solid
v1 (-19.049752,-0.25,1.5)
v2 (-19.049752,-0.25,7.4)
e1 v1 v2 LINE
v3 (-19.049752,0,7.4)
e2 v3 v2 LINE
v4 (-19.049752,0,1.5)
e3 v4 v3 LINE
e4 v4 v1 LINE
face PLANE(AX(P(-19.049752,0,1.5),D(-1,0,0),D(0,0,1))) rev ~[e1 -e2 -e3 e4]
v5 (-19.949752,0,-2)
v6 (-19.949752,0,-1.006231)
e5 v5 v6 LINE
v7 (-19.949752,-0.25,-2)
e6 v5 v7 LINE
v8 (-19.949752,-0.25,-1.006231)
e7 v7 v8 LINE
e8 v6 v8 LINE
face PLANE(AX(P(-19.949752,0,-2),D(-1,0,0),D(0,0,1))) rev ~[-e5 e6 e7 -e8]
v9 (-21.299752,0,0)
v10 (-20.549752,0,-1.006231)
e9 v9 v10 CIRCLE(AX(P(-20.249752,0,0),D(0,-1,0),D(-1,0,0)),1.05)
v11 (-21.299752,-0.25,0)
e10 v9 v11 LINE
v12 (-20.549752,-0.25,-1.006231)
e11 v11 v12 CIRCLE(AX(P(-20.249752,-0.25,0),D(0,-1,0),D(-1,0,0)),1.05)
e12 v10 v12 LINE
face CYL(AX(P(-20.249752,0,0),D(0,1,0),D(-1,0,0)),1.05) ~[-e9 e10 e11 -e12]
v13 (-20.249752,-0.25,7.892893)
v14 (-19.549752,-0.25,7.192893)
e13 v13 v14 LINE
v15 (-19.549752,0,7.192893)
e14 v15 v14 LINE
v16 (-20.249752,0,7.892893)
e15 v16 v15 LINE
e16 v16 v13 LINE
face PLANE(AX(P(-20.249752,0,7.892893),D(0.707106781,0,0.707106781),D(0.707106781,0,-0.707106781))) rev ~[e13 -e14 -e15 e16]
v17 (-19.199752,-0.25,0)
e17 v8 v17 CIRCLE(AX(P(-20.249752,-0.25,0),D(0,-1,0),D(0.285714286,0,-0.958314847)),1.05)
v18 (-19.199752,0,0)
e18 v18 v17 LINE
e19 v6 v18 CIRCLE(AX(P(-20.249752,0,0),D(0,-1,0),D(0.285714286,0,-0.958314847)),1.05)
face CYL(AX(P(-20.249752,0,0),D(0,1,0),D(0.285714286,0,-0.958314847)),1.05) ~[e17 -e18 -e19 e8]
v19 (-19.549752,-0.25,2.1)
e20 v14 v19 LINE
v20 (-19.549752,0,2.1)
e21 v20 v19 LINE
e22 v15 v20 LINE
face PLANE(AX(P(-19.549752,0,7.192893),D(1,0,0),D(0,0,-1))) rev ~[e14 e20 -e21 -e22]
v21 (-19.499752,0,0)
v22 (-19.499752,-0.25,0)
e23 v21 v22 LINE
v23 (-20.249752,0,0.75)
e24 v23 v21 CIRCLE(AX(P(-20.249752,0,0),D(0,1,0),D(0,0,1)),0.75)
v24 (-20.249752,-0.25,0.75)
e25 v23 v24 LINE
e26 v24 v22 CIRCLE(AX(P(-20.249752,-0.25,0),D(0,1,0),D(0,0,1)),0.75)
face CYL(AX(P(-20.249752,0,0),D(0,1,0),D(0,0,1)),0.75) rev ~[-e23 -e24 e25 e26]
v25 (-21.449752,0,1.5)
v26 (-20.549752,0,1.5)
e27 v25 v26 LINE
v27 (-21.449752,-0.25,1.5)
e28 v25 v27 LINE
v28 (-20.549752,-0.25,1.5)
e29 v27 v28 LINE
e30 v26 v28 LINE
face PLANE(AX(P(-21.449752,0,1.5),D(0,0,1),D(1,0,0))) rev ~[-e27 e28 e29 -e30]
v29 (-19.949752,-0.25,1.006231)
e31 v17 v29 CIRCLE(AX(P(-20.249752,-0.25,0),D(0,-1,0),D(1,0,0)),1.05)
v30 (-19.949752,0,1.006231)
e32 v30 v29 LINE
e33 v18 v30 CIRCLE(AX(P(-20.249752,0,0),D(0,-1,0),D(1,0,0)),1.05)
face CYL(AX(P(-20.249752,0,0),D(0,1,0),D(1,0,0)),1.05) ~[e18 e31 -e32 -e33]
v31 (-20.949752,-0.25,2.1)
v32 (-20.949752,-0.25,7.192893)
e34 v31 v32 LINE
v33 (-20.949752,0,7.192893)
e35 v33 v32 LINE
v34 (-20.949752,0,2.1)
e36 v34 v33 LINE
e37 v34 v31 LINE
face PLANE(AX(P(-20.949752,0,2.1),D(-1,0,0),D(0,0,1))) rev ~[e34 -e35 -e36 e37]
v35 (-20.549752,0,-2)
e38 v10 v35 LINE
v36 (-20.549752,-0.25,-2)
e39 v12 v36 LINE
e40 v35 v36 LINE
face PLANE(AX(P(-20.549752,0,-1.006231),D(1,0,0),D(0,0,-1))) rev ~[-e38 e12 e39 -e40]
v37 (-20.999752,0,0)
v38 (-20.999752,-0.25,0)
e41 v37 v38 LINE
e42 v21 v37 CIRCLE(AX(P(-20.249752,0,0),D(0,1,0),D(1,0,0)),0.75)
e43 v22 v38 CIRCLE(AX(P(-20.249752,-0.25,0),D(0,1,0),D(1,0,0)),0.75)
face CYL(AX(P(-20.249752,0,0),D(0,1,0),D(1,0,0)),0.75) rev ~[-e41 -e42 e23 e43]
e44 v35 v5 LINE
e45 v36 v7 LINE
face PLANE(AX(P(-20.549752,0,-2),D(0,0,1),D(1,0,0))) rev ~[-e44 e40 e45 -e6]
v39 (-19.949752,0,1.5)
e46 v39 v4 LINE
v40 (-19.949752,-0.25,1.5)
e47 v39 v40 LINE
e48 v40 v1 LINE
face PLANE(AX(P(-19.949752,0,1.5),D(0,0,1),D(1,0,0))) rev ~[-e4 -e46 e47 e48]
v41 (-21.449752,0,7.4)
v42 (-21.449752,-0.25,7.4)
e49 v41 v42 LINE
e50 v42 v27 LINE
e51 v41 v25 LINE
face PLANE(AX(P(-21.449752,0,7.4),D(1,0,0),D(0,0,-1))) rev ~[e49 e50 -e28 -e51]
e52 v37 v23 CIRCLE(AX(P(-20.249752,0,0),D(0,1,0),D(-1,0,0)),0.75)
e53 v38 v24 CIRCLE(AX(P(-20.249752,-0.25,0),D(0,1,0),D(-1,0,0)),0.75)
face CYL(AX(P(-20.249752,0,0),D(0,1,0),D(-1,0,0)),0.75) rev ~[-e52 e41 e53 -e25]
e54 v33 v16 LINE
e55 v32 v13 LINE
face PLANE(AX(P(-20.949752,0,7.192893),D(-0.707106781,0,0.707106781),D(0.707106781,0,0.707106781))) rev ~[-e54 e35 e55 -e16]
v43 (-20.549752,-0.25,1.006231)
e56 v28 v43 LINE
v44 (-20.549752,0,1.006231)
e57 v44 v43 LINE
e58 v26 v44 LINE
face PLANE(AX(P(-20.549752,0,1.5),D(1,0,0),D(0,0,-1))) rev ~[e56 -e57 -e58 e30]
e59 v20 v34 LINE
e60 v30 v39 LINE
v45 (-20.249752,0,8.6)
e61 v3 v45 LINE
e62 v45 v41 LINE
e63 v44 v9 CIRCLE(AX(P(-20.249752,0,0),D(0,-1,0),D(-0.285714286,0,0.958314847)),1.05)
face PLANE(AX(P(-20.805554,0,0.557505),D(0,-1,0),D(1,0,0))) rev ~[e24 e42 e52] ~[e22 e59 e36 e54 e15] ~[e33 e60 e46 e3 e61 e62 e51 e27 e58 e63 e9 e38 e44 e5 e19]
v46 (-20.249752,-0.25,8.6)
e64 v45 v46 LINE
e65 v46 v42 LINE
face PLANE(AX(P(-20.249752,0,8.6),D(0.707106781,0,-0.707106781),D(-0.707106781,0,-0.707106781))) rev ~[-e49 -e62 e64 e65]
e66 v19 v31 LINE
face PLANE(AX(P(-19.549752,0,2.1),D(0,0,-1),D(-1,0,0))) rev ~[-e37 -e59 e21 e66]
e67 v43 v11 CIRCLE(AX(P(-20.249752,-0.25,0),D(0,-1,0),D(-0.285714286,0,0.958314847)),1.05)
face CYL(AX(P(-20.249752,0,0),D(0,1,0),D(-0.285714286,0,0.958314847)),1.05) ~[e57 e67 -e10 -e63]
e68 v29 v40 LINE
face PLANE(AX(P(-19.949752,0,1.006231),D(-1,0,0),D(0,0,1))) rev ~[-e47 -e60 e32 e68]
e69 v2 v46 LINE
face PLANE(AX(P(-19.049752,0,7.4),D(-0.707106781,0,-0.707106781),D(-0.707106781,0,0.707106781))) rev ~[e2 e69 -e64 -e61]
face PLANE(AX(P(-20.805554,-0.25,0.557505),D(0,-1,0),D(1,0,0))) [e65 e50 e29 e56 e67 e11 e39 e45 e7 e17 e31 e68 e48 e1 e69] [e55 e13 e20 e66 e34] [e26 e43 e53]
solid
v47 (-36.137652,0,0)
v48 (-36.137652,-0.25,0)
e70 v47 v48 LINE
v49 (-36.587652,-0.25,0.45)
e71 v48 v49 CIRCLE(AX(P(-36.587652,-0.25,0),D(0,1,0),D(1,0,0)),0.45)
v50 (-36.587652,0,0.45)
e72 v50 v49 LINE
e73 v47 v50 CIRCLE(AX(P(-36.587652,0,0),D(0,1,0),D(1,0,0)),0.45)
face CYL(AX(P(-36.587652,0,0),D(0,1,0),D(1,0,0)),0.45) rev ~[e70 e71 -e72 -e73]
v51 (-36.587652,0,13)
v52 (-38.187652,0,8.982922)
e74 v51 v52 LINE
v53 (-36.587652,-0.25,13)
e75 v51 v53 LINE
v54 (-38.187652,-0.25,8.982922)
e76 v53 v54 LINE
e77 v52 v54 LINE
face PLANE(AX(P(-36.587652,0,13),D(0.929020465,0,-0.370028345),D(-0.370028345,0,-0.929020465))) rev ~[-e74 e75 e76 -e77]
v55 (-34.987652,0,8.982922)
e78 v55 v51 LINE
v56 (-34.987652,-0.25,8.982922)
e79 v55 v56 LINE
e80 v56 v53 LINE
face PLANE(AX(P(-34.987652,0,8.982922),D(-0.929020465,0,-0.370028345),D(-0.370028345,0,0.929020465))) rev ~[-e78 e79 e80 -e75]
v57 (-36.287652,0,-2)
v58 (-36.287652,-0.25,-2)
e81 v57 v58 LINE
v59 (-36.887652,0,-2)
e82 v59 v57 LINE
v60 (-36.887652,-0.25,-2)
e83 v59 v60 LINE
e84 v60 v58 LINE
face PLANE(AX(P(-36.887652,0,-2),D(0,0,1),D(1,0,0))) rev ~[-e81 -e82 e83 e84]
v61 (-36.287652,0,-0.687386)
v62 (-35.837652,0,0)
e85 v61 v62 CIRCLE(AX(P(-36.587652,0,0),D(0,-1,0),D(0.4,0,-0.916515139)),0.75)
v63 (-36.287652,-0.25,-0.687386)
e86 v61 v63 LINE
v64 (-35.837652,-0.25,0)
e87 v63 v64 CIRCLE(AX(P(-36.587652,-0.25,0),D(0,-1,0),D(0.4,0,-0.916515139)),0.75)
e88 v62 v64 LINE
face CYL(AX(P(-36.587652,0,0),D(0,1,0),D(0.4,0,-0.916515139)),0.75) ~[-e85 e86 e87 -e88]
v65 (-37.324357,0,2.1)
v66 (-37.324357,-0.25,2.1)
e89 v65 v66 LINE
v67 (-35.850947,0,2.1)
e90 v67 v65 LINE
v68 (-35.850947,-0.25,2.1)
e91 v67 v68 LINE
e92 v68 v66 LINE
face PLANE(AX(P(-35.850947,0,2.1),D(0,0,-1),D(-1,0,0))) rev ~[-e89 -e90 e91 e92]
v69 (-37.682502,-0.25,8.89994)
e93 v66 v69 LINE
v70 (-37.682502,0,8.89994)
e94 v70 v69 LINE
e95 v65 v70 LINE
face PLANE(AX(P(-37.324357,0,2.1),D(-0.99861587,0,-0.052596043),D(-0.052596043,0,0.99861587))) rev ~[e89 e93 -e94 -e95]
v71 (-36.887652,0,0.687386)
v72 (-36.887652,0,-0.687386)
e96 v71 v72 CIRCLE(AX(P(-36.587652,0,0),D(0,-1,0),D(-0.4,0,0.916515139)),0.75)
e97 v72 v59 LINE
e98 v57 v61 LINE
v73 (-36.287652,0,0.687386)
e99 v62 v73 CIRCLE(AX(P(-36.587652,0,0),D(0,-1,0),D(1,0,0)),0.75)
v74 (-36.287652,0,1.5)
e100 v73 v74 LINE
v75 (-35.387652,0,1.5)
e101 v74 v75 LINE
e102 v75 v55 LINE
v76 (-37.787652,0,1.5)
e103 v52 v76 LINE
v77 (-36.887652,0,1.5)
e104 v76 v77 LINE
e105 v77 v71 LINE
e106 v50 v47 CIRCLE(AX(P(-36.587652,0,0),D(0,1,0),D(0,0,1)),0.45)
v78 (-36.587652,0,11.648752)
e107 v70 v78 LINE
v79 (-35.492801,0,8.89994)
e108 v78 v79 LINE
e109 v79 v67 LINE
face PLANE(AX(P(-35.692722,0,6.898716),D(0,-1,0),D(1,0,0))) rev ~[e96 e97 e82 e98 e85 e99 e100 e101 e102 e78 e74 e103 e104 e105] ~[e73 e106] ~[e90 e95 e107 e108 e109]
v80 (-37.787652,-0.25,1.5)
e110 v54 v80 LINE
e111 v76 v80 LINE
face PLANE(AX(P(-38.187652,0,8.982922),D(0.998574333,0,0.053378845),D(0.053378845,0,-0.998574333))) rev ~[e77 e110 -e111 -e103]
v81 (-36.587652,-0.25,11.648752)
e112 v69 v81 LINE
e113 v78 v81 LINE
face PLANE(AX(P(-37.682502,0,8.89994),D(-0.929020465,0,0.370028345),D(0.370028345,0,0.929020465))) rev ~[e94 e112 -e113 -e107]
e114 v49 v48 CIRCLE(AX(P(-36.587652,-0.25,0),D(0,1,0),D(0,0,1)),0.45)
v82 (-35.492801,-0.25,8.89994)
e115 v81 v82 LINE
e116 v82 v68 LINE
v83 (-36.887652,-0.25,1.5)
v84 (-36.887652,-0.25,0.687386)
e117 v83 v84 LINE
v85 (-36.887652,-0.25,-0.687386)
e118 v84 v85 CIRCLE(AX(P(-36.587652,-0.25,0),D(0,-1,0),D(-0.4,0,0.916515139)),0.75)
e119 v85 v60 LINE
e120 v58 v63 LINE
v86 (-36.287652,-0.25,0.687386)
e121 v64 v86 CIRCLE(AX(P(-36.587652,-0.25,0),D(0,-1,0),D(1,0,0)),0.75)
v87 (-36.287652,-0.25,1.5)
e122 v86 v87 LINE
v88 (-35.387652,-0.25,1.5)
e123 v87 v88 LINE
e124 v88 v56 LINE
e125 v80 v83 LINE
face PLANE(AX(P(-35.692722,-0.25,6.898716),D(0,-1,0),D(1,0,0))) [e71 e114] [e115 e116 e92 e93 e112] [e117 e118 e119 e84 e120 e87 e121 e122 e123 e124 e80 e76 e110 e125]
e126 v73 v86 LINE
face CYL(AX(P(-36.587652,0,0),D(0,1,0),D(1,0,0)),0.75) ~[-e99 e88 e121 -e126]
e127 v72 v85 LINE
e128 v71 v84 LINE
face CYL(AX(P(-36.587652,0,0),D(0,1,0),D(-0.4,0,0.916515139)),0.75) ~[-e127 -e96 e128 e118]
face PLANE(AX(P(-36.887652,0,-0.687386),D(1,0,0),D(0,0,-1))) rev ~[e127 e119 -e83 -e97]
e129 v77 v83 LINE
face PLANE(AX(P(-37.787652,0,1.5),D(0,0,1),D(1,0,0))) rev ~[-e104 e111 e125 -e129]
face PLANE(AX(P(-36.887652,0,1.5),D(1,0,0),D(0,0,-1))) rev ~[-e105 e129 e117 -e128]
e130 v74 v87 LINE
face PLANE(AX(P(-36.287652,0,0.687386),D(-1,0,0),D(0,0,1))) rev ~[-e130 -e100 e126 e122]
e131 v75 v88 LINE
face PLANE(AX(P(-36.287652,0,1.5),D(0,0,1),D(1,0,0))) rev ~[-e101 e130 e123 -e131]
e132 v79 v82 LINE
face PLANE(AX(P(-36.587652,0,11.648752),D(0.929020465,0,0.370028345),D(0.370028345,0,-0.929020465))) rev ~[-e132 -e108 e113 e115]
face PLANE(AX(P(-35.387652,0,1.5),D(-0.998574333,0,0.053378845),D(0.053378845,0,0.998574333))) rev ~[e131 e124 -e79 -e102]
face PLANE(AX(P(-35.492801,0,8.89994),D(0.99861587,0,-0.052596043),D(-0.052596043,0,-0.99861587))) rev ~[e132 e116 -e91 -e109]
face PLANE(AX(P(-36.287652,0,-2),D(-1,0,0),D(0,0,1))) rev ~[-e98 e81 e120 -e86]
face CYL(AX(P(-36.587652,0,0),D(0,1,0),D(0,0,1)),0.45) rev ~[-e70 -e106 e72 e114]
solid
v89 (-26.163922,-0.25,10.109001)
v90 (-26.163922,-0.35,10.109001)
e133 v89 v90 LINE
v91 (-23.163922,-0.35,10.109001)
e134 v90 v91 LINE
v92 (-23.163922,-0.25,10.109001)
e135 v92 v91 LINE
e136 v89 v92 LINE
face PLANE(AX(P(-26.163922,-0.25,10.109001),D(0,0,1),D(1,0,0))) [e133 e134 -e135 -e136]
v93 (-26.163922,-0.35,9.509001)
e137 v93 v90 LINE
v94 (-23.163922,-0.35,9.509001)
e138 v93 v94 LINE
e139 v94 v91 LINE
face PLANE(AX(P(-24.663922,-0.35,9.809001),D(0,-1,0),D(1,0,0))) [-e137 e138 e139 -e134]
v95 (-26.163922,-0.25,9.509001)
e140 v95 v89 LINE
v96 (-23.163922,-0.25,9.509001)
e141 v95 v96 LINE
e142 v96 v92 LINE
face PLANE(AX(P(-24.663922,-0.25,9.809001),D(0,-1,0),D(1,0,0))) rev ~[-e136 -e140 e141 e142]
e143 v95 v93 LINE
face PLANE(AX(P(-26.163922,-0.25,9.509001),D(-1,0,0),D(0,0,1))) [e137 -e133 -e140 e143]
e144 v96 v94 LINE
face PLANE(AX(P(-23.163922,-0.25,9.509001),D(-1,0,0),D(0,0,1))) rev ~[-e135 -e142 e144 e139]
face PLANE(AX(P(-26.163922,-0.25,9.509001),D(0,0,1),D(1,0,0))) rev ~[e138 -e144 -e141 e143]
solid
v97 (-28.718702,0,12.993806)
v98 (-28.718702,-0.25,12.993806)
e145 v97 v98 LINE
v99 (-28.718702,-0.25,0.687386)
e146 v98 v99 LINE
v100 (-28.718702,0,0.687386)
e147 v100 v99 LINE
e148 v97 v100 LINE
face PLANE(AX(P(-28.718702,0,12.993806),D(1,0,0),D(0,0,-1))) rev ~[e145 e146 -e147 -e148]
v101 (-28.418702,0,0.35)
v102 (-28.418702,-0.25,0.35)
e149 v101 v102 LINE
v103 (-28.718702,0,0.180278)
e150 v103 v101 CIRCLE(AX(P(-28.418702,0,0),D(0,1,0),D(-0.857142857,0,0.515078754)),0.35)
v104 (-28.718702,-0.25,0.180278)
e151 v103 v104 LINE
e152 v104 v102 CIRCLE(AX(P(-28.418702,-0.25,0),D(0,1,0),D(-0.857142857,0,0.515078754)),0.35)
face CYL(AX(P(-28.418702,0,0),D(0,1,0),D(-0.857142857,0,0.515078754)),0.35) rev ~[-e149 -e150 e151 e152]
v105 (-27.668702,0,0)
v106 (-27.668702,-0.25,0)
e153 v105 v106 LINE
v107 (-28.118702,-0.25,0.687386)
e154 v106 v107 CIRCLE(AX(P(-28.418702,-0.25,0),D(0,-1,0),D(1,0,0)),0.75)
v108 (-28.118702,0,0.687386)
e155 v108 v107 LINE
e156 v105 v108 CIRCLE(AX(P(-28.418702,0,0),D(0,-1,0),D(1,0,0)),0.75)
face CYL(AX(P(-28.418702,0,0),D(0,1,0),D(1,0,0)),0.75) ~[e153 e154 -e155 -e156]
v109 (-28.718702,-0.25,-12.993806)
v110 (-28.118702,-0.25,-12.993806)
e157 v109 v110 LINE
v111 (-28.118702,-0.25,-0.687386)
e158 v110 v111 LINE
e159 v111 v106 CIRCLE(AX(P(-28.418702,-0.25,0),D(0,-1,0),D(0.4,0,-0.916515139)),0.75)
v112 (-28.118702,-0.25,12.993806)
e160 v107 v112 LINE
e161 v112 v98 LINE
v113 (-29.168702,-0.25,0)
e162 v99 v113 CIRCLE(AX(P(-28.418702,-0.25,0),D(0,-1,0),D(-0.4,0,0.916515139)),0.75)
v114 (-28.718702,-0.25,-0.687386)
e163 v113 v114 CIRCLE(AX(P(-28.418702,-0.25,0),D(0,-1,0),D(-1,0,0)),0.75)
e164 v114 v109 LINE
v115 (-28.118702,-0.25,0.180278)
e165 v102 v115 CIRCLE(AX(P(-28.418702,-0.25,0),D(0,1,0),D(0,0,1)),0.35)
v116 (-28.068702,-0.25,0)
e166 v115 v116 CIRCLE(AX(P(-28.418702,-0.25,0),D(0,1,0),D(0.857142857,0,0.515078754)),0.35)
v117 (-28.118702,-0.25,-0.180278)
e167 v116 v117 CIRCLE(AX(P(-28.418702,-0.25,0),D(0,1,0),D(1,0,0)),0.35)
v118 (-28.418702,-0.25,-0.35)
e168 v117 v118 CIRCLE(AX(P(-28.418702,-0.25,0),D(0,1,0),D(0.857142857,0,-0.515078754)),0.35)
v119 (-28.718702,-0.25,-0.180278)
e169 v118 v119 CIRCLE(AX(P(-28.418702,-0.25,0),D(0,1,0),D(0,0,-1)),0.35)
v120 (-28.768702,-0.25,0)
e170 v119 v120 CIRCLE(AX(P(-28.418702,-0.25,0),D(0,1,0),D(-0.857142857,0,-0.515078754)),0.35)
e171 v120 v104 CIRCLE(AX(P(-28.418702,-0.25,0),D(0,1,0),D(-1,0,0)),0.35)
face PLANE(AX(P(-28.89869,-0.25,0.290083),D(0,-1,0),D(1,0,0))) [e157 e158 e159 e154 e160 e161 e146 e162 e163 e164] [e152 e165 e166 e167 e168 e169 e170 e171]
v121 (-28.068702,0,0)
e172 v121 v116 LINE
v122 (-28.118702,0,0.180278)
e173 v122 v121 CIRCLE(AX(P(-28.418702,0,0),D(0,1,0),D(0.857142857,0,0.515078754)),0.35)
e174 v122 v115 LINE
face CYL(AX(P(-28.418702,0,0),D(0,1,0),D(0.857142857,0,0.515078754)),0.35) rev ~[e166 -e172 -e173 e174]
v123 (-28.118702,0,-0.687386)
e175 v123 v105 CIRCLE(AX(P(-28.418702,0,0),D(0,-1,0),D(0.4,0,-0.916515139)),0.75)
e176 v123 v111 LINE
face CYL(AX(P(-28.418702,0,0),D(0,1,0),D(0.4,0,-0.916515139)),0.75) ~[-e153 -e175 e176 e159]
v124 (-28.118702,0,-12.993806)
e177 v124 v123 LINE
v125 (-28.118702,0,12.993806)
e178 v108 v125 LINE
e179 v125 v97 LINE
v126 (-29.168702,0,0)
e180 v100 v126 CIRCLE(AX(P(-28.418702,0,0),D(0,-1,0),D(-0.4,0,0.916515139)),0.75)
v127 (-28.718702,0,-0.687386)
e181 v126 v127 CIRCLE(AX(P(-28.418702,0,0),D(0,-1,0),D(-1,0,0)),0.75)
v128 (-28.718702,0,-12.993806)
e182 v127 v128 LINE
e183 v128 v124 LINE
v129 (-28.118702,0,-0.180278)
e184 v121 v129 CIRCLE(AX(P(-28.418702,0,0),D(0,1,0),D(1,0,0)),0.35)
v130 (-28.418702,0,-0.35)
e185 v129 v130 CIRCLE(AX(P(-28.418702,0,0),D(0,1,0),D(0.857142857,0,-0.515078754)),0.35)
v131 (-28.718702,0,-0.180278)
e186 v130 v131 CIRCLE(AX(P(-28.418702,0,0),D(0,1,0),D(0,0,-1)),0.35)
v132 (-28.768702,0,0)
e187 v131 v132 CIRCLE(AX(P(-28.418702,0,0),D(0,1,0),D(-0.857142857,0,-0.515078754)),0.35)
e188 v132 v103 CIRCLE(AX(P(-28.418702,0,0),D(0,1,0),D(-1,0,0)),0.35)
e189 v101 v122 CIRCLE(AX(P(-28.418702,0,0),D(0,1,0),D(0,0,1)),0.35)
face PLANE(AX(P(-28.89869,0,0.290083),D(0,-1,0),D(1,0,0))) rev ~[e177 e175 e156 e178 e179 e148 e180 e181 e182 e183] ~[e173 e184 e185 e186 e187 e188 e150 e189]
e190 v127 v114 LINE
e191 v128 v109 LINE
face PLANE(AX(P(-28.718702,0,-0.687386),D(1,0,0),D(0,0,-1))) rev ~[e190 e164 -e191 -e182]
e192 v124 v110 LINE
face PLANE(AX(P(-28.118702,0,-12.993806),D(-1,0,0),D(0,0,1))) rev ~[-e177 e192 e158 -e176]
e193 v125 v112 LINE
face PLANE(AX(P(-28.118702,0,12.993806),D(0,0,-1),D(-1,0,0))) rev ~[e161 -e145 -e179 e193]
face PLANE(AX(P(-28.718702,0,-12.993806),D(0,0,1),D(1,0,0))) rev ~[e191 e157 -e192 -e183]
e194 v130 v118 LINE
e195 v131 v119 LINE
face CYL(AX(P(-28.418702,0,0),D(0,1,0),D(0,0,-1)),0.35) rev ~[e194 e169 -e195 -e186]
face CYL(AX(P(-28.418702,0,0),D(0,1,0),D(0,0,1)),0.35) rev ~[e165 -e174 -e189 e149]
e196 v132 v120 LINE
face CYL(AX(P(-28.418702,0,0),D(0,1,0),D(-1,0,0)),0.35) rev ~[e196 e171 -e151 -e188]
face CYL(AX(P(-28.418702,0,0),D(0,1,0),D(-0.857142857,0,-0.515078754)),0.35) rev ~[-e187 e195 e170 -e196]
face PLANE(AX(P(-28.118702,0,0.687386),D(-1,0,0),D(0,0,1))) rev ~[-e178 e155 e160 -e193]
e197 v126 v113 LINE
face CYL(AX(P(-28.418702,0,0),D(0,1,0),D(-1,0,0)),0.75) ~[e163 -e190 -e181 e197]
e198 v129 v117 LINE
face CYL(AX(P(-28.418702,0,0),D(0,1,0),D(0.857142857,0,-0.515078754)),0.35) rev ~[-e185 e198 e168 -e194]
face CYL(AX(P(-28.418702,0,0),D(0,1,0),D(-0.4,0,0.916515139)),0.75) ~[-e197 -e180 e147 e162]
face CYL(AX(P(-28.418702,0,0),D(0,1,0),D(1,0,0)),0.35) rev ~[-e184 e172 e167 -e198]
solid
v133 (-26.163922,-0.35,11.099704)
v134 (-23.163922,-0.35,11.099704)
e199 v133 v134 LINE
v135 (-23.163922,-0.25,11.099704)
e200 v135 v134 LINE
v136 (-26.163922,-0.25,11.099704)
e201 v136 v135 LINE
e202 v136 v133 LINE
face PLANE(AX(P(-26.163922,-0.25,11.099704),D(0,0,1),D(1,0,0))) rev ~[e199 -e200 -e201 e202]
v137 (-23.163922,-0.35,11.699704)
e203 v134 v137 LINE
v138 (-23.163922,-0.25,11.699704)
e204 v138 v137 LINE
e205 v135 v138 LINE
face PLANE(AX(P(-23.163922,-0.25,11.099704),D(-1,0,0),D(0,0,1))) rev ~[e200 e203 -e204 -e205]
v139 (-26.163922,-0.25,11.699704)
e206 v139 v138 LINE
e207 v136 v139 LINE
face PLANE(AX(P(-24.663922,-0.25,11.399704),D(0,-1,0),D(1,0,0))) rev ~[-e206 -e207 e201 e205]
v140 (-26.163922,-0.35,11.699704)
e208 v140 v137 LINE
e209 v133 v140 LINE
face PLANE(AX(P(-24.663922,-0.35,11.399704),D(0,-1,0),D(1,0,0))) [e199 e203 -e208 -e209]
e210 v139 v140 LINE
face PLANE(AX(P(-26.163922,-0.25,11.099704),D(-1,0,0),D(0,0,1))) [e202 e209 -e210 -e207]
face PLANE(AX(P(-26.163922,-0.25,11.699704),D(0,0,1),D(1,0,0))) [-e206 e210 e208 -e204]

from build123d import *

# Parameters (mm, degrees)
F0_W     = 0.5
F0_H     = 0.6
F1_DEPTH = 0.25
F0_W_2   = 3
F2_DEPTH = 0.1


# Not quite as in the source:
# - a feature names something its author has since deleted; it is built from what else it names


with BuildPart() as f1:
    # F0 (on Front) → F1 (new body)
    with BuildSketch(Plane.XZ):
        with BuildLine():
            ThreePointArc((-20.5497518182, 1.0062305899), (-21.0916247302, 0.6274950199), (-21.2997518182, 0))
            Line((-21.2997518182, 0), (-20.9997518182, 0))
            ThreePointArc((-20.9997518182, 0), (-20.7800819041, 0.5303300859), (-20.2497518182, 0.75))
            Line((-20.2497518182, 0.75), (-20.2497518182, 1.05))
            ThreePointArc((-20.2497518182, 1.05), (-20.4013398794, 1.0390000287), (-20.5497518182, 1.0062305899))
        make_face()
        with BuildLine():
            Line((-20.9997518182, 0), (-21.2997518182, 0))
            ThreePointArc((-21.2997518182, 0), (-21.0916247302, -0.6274950199), (-20.5497518182, -1.0062305899))
            ThreePointArc((-20.5497518182, -1.0062305899), (-20.2497518182, -1.05), (-19.9497518182, -1.0062305899))
            ThreePointArc((-19.9497518182, -1.0062305899), (-19.4078789062, -0.6274950199), (-19.1997518182, 0))
            ThreePointArc((-19.1997518182, 0), (-19.4078789062, 0.6274950199), (-19.9497518182, 1.0062305899))
            ThreePointArc((-19.9497518182, 1.0062305899), (-20.0981637569, 1.0390000287), (-20.2497518182, 1.05))
            Line((-20.2497518182, 1.05), (-20.2497518182, 0.75))
            ThreePointArc((-20.2497518182, 0.75), (-19.7194217323, 0.5303300859), (-19.4997518182, 0))
            ThreePointArc((-19.4997518182, 0), (-20.2497518182, -0.75), (-20.9997518182, 0))
        make_face()
        with BuildLine():
            Line((-20.5497518182, 1.5), (-20.5497518182, 1.0062305899))
            ThreePointArc((-20.5497518182, 1.0062305899), (-20.4013398794, 1.0390000287), (-20.2497518182, 1.05))
            Line((-20.2497518182, 1.05), (-20.2497518182, 1.5))
            Line((-20.2497518182, 1.5), (-20.5497518182, 1.5))
        make_face()
        with BuildLine():
            ThreePointArc((-19.9497518182, -1.0062305899), (-20.2497518182, -1.05), (-20.5497518182, -1.0062305899))
            Line((-20.5497518182, -1.0062305899), (-20.5497518182, -2))
            Line((-20.5497518182, -2), (-19.9497518182, -2))
            Line((-19.9497518182, -2), (-19.9497518182, -1.0062305899))
        make_face()
        with BuildLine():
            Line((-20.2497518182, 1.5), (-20.2497518182, 1.05))
            ThreePointArc((-20.2497518182, 1.05), (-20.0981637569, 1.0390000287), (-19.9497518182, 1.0062305899))
            Line((-19.9497518182, 1.0062305899), (-19.9497518182, 1.5))
            Line((-19.9497518182, 1.5), (-20.2497518182, 1.5))
        make_face()
        Polygon((-20.9497518182, 1.5), (-20.5497518182, 1.5), (-20.2497518182, 1.5), (-20.2497518182, 2.1), (-20.9497518182, 2.1), align=None)
        Polygon((-20.2497518182, 2.1), (-20.2497518182, 1.5), (-19.9497518182, 1.5), (-19.5497518182, 1.5), (-19.5497518182, 2.1), align=None)
        with Locations((-21.1997518182, 1.8)):
            Rectangle(F0_W, F0_H)
        Polygon((-21.4497518182, 2.1), (-20.9497518182, 2.1), (-20.9497518182, 7.1928932188), (-20.2497518182, 7.8928932188), (-20.2497518182, 8.6), (-21.4497518182, 7.4), align=None)
        with Locations((-19.2997518182, 1.8)):
            Rectangle(F0_W, F0_H)
        Polygon((-20.2497518182, 8.6), (-20.2497518182, 7.8928932188), (-19.5497518182, 7.1928932188), (-19.5497518182, 2.1), (-19.0497518182, 2.1), (-19.0497518182, 7.4), align=None)
    extrude(amount=F1_DEPTH)


with BuildPart() as f1b:
    # F0 (on Front) → F1, piece 2 (new body)
    with BuildSketch(Plane.XZ):
        with BuildLine():
            ThreePointArc((-28.7187018186, 0.6873863542), (-29.0461968385, 0.4107919181), (-29.1687018186, 0))
            Line((-29.1687018186, 0), (-28.7687018186, 0))
            ThreePointArc((-28.7687018186, 0), (-28.7559702577, 0.0935414347), (-28.7187018186, 0.1802775638))
            Line((-28.7187018186, 0.1802775638), (-28.7187018186, 0.6873863542))
        make_face()
        with BuildLine():
            Line((-28.7687018186, 0), (-29.1687018186, 0))
            ThreePointArc((-29.1687018186, 0), (-29.0461968385, -0.4107919181), (-28.7187018186, -0.6873863542))
            Line((-28.7187018186, -0.6873863542), (-28.7187018186, -0.1802775638))
            ThreePointArc((-28.7187018186, -0.1802775638), (-28.7559702577, -0.0935414347), (-28.7687018186, 0))
        make_face()
        with BuildLine():
            Line((-28.7187018186, 12.9938064694), (-28.7187018186, 0.6873863542))
            ThreePointArc((-28.7187018186, 0.6873863542), (-28.5719340514, 0.7341797347), (-28.4187018186, 0.75))
            Line((-28.4187018186, 0.75), (-28.4187018186, 12.9938064694))
            Line((-28.4187018186, 12.9938064694), (-28.7187018186, 12.9938064694))
        make_face()
        with BuildLine():
            ThreePointArc((-28.4187018186, 0.75), (-28.5719340514, 0.7341797347), (-28.7187018186, 0.6873863542))
            Line((-28.7187018186, 0.6873863542), (-28.7187018186, 0.1802775638))
            ThreePointArc((-28.7187018186, 0.1802775638), (-28.5910428362, 0.3046285831), (-28.4187018186, 0.35))
            Line((-28.4187018186, 0.35), (-28.4187018186, 0.75))
        make_face()
        with BuildLine():
            Line((-28.7187018186, -0.1802775638), (-28.7187018186, -0.6873863542))
            ThreePointArc((-28.7187018186, -0.6873863542), (-28.5719340514, -0.7341797347), (-28.4187018186, -0.75))
            Line((-28.4187018186, -0.75), (-28.4187018186, -0.35))
            ThreePointArc((-28.4187018186, -0.35), (-28.5910428362, -0.3046285831), (-28.7187018186, -0.1802775638))
        make_face()
        with BuildLine():
            ThreePointArc((-28.4187018186, -0.75), (-28.5719340514, -0.7341797347), (-28.7187018186, -0.6873863542))
            Line((-28.7187018186, -0.6873863542), (-28.7187018186, -12.9938064694))
            Line((-28.7187018186, -12.9938064694), (-28.4187018186, -12.9938064694))
            Line((-28.4187018186, -12.9938064694), (-28.4187018186, -0.75))
        make_face()
        with BuildLine():
            Line((-28.4187018186, 12.9938064694), (-28.4187018186, 0.75))
            ThreePointArc((-28.4187018186, 0.75), (-28.2654695858, 0.7341797347), (-28.1187018186, 0.6873863542))
            Line((-28.1187018186, 0.6873863542), (-28.1187018186, 12.9938064694))
            Line((-28.1187018186, 12.9938064694), (-28.4187018186, 12.9938064694))
        make_face()
        with BuildLine():
            ThreePointArc((-28.1187018186, 0.6873863542), (-28.2654695858, 0.7341797347), (-28.4187018186, 0.75))
            Line((-28.4187018186, 0.75), (-28.4187018186, 0.35))
            ThreePointArc((-28.4187018186, 0.35), (-28.246360801, 0.3046285831), (-28.1187018186, 0.1802775638))
            Line((-28.1187018186, 0.1802775638), (-28.1187018186, 0.6873863542))
        make_face()
        with BuildLine():
            Line((-28.4187018186, -0.35), (-28.4187018186, -0.75))
            ThreePointArc((-28.4187018186, -0.75), (-28.2654695858, -0.7341797347), (-28.1187018186, -0.6873863542))
            Line((-28.1187018186, -0.6873863542), (-28.1187018186, -0.1802775638))
            ThreePointArc((-28.1187018186, -0.1802775638), (-28.246360801, -0.3046285831), (-28.4187018186, -0.35))
        make_face()
        with BuildLine():
            ThreePointArc((-28.1187018186, -0.6873863542), (-28.2654695858, -0.7341797347), (-28.4187018186, -0.75))
            Line((-28.4187018186, -0.75), (-28.4187018186, -12.9938064694))
            Line((-28.4187018186, -12.9938064694), (-28.1187018186, -12.9938064694))
            Line((-28.1187018186, -12.9938064694), (-28.1187018186, -0.6873863542))
        make_face()
        with BuildLine():
            ThreePointArc((-27.6687018186, 0), (-27.7912067987, 0.4107919181), (-28.1187018186, 0.6873863542))
            Line((-28.1187018186, 0.6873863542), (-28.1187018186, 0.1802775638))
            ThreePointArc((-28.1187018186, 0.1802775638), (-28.0814333795, 0.0935414347), (-28.0687018186, 0))
            Line((-28.0687018186, 0), (-27.6687018186, 0))
        make_face()
        with BuildLine():
            Line((-28.1187018186, -0.1802775638), (-28.1187018186, -0.6873863542))
            ThreePointArc((-28.1187018186, -0.6873863542), (-27.7912067987, -0.4107919181), (-27.6687018186, 0))
            Line((-27.6687018186, 0), (-28.0687018186, 0))
            ThreePointArc((-28.0687018186, 0), (-28.0814333795, -0.0935414347), (-28.1187018186, -0.1802775638))
        make_face()
    extrude(amount=F1_DEPTH)


with BuildPart() as f1c:
    # F0 (on Front) → F1, piece 3 (new body)
    with BuildSketch(Plane.XZ):
        Polygon((-34.987651819, 8.9829219505), (-36.587651819, 13), (-36.587651819, 11.6487521661), (-35.4928014695, 8.8999400996), (-35.850947132, 2.1), (-36.587651819, 2.1), (-36.587651819, 1.5), (-36.287651819, 1.5), (-35.387651819, 1.5), align=None)
        Polygon((-36.587651819, 11.6487521661), (-36.587651819, 13), (-38.187651819, 8.9829219505), (-37.787651819, 1.5), (-36.887651819, 1.5), (-36.587651819, 1.5), (-36.587651819, 2.1), (-37.3243565059, 2.1), (-37.6825021685, 8.8999400996), align=None)
        with BuildLine():
            Line((-36.287651819, 0.6873863542), (-36.287651819, 1.5))
            Line((-36.287651819, 1.5), (-36.587651819, 1.5))
            Line((-36.587651819, 1.5), (-36.587651819, 0.75))
            ThreePointArc((-36.587651819, 0.75), (-36.4344195862, 0.7341797347), (-36.287651819, 0.6873863542))
        make_face()
        with BuildLine():
            Line((-36.587651819, 0.75), (-36.587651819, 1.5))
            Line((-36.587651819, 1.5), (-36.887651819, 1.5))
            Line((-36.887651819, 1.5), (-36.887651819, 0.6873863542))
            ThreePointArc((-36.887651819, 0.6873863542), (-36.7408840518, 0.7341797347), (-36.587651819, 0.75))
        make_face()
        with BuildLine():
            ThreePointArc((-35.837651819, 0), (-35.9601567991, 0.4107919181), (-36.287651819, 0.6873863542))
            ThreePointArc((-36.287651819, 0.6873863542), (-36.4344195862, 0.7341797347), (-36.587651819, 0.75))
            Line((-36.587651819, 0.75), (-36.587651819, 0.45))
            ThreePointArc((-36.587651819, 0.45), (-36.2694537675, 0.3181980515), (-36.137651819, 0))
            Line((-36.137651819, 0), (-35.837651819, 0))
        make_face()
        with BuildLine():
            Line((-36.587651819, 0.45), (-36.587651819, 0.75))
            ThreePointArc((-36.587651819, 0.75), (-36.7408840518, 0.7341797347), (-36.887651819, 0.6873863542))
            ThreePointArc((-36.887651819, 0.6873863542), (-37.337651819, 0), (-36.887651819, -0.6873863542))
            ThreePointArc((-36.887651819, -0.6873863542), (-36.587651819, -0.75), (-36.287651819, -0.6873863542))
            ThreePointArc((-36.287651819, -0.6873863542), (-35.9601567991, -0.4107919181), (-35.837651819, 0))
            Line((-35.837651819, 0), (-36.137651819, 0))
            ThreePointArc((-36.137651819, 0), (-36.9058498705, -0.3181980515), (-36.587651819, 0.45))
        make_face()
        with BuildLine():
            ThreePointArc((-36.287651819, -0.6873863542), (-36.587651819, -0.75), (-36.887651819, -0.6873863542))
            Line((-36.887651819, -0.6873863542), (-36.887651819, -2))
            Line((-36.887651819, -2), (-36.287651819, -2))
            Line((-36.287651819, -2), (-36.287651819, -0.6873863542))
        make_face()
    extrude(amount=F1_DEPTH)


with BuildPart() as f1d:
    # F0 (on Front) → F1, piece 4 (new body)
    with BuildSketch(Plane.XZ):
        with Locations((-24.663922295, 11.3997036099)):
            Rectangle(F0_W_2, F0_H)
    extrude(amount=F1_DEPTH)


with BuildPart() as f1e:
    # F0 (on Front) → F1, piece 5 (new body)
    with BuildSketch(Plane.XZ):
        with Locations((-24.663922295, 9.8090009272)):
            Rectangle(F0_W_2, F0_H)
    extrude(amount=F1_DEPTH)


with BuildPart() as f2:
    # F2 (new): a face of the model
    f2_faces = [f1d.part.faces().sort_by_distance(p)[0] for p in [
        (-24.663922295, -0.25, 11.3997036099),
    ]]
    extrude(f2_faces, amount=F2_DEPTH)


with BuildPart() as f2b:
    # F2#2 (new): a face of the model
    f2_2_faces = [f1e.part.faces().sort_by_distance(p)[0] for p in [
        (-24.663922295, -0.25, 9.8090009272),
    ]]
    extrude(f2_2_faces, amount=F2_DEPTH)


solid = Compound([f1.part, f1b.part, f1c.part, f2.part, f2b.part])
